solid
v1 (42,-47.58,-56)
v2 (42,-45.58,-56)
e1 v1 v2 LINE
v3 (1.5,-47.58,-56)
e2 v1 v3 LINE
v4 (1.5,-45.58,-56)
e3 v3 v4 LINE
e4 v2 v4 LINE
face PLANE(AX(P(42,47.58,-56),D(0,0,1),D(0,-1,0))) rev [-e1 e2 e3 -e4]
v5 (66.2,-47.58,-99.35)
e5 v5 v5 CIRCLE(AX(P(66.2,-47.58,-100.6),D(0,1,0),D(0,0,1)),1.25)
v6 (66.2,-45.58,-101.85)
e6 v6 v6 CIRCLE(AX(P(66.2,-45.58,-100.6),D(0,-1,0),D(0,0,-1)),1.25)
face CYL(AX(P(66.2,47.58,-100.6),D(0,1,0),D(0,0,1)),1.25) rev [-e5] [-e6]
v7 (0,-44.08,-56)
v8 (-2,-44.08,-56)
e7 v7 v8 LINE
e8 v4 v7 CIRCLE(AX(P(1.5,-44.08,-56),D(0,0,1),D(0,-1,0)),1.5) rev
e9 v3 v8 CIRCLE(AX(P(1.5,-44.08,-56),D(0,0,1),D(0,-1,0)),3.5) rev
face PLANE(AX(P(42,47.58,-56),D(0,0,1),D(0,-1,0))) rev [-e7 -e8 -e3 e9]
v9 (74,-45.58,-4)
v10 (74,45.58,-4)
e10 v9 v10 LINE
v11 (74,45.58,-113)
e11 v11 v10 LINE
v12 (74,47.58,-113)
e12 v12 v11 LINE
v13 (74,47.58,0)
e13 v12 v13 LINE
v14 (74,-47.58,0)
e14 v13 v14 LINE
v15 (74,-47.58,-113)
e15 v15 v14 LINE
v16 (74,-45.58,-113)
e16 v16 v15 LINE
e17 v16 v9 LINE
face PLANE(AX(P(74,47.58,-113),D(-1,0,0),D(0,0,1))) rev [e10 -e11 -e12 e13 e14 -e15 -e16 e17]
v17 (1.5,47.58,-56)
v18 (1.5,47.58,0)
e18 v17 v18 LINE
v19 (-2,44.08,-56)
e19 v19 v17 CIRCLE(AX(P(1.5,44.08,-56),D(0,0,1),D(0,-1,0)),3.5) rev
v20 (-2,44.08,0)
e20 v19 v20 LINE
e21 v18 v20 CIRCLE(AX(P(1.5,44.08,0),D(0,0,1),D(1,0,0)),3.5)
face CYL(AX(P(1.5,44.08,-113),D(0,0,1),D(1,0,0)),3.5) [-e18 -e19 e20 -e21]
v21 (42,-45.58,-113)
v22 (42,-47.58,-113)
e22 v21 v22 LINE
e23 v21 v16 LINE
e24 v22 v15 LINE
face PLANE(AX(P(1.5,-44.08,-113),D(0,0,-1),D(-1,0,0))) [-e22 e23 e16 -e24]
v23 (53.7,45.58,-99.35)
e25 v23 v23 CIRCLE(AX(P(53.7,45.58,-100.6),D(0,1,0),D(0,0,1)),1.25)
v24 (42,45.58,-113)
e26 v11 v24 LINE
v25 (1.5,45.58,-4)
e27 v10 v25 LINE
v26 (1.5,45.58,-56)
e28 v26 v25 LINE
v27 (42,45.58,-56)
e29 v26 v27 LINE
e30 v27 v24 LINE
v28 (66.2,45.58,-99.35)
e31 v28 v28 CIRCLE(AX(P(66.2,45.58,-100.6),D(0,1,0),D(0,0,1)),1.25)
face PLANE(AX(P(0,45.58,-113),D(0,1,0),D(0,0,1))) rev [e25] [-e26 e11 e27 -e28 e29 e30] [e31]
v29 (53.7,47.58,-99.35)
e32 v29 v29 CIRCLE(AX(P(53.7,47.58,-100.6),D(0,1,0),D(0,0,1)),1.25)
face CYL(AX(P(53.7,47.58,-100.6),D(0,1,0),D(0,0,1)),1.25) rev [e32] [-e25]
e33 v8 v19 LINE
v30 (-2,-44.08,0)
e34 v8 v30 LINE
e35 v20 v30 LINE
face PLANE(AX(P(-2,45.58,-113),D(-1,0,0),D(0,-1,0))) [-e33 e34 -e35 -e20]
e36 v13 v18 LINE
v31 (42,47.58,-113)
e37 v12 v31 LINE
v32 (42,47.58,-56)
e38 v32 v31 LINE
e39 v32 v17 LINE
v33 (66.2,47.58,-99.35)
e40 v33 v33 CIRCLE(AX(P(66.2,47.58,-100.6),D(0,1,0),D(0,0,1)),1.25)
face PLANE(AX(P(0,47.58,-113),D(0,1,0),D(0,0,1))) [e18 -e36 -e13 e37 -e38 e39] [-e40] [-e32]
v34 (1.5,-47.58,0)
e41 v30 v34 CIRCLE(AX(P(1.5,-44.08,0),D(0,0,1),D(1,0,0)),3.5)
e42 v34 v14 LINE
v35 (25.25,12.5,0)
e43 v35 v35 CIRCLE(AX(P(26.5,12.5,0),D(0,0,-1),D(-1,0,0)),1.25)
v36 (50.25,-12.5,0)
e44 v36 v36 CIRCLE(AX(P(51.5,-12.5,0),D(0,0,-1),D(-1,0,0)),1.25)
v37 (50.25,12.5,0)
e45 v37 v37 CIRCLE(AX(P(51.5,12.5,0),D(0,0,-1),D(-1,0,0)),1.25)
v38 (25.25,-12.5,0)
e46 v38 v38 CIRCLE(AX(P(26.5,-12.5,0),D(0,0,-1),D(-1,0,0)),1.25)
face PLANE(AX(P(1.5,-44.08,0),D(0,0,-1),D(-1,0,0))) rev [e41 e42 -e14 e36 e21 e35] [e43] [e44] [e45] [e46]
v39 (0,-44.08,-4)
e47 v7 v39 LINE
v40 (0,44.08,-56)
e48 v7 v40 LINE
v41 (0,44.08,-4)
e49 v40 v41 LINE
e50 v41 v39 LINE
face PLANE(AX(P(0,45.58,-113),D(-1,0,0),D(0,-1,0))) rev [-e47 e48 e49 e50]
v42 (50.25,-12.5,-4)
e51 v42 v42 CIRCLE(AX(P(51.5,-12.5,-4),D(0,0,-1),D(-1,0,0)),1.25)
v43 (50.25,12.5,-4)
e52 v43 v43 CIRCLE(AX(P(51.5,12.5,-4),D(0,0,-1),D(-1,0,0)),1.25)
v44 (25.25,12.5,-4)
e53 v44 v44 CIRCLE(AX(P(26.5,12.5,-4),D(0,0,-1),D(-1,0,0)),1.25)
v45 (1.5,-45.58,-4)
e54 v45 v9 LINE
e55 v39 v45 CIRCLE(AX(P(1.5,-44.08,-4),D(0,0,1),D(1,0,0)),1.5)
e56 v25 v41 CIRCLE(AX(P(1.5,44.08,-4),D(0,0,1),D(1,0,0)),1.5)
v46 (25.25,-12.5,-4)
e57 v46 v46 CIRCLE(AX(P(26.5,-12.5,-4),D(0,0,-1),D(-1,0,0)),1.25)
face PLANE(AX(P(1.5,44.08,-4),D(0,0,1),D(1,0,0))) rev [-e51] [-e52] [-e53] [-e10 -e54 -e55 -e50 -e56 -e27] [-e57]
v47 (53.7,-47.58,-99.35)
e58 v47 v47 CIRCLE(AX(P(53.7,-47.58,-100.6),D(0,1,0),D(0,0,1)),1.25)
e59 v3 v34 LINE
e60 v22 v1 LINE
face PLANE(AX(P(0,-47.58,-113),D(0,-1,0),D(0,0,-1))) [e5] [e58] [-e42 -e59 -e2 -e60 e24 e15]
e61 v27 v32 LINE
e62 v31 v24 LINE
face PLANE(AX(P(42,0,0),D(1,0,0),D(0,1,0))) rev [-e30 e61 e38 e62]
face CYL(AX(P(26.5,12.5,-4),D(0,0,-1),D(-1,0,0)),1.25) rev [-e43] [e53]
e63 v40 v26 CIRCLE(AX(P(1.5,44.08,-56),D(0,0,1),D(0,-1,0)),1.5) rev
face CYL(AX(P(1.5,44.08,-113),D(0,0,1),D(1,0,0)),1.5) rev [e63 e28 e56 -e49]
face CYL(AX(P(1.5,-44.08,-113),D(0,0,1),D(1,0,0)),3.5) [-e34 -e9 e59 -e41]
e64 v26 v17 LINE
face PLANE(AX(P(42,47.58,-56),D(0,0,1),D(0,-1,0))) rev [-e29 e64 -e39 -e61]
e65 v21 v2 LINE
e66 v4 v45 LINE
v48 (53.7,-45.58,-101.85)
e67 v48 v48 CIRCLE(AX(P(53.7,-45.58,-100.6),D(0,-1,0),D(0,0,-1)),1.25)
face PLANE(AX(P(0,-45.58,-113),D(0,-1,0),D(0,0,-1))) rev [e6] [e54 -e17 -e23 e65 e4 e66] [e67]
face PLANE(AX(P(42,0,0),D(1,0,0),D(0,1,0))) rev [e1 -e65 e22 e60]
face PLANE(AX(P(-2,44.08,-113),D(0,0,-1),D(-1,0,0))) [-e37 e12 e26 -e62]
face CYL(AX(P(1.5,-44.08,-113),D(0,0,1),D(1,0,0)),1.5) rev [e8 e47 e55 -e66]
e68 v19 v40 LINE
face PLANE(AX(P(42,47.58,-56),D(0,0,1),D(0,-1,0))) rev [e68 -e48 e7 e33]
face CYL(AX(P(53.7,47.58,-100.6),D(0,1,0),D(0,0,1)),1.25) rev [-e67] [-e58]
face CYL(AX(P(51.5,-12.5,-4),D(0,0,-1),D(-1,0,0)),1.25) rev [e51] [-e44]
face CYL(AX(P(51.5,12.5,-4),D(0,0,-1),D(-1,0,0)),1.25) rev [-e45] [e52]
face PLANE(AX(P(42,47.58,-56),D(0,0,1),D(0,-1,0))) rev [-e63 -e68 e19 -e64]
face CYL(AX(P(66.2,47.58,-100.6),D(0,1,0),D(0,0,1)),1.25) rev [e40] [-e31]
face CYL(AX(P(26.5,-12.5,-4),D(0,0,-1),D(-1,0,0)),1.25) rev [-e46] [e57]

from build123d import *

# Parameters (mm, degrees)
SM_BASE_FLANGE_1_DEPTH = 113
EXTRUDE_1_DEPTH        = 4
HOLE_WIZARD_M3_1_D     = 2.5
SKETCH_11_W            = 71.5874944
SKETCH_11_H            = 95.16
CUT_EXTRUDE_1_DEPTH    = 44
HOLE_WIZARD_M3_2_D     = 2.5


# Sheet-metal steps are written as plain solids
with BuildPart() as part:
    # Sketch 2 → 基体-法兰1 (new body)
    with BuildSketch(Plane.XY):
        with BuildLine():
            Line((74, 45.58), (1.5, 45.58))
            ThreePointArc((1.5, 45.58), (0.439339828, 45.140660172), (0, 44.08))
            Line((0, 44.08), (0, -44.08))
            ThreePointArc((0, -44.08), (0.439339828, -45.140660172), (1.5, -45.58))
            Line((1.5, -45.58), (74, -45.58))
            Line((74, -45.58), (74, -47.58))
            Line((74, -47.58), (1.5, -47.58))
            ThreePointArc((1.5, -47.58), (-0.974873734, -46.554873734), (-2, -44.08))
            Line((-2, -44.08), (-2, 44.08))
            ThreePointArc((-2, 44.08), (-0.974873734, 46.554873734), (1.5, 47.58))
            Line((1.5, 47.58), (74, 47.58))
            Line((74, 47.58), (74, 45.58))
        make_face()
    extrude(amount=-SM_BASE_FLANGE_1_DEPTH)

    # 草图7 → 凸台-拉伸1 (add)
    with BuildSketch(Plane.XY):
        with BuildLine():
            Line((74, 45.58), (1.5, 45.58))
            ThreePointArc((1.5, 45.58), (0.439339828, 45.140660172), (0, 44.08))
            Line((0, 44.08), (0, -44.08))
            ThreePointArc((0, -44.08), (0.439339828, -45.140660172), (1.5, -45.58))
            Line((1.5, -45.58), (74, -45.58))
            Line((74, -45.58), (74, 45.58))
        make_face()
    extrude(amount=-EXTRUDE_1_DEPTH)

    # M3 螺纹孔1 (through all)
    with Locations(Plane(origin=(0, 47.58, 0), x_dir=(1, 0, 0), z_dir=(0, 1, 0))):
        with Locations((53.7, 100.6), (66.2, 100.6)):
            Hole(HOLE_WIZARD_M3_1_D / 2)

    # 草图11 → 切除-拉伸1 (cut)
    with BuildSketch(Plane.ZY.offset(2)):
        with Locations((-91.7937472, 0)):
            Rectangle(SKETCH_11_W, SKETCH_11_H)
    extrude(amount=-CUT_EXTRUDE_1_DEPTH, mode=Mode.SUBTRACT)

    # M3 螺纹孔2 (through all)
    with Locations(Plane(origin=(0, 0, -4), x_dir=(-1, 0, 0), z_dir=(0, 0, -1))):
        with Locations((-51.5, 12.5), (-26.5, 12.5), (-26.5, -12.5), (-51.5, -12.5)):
            Hole(HOLE_WIZARD_M3_2_D / 2)


solid = part.part
